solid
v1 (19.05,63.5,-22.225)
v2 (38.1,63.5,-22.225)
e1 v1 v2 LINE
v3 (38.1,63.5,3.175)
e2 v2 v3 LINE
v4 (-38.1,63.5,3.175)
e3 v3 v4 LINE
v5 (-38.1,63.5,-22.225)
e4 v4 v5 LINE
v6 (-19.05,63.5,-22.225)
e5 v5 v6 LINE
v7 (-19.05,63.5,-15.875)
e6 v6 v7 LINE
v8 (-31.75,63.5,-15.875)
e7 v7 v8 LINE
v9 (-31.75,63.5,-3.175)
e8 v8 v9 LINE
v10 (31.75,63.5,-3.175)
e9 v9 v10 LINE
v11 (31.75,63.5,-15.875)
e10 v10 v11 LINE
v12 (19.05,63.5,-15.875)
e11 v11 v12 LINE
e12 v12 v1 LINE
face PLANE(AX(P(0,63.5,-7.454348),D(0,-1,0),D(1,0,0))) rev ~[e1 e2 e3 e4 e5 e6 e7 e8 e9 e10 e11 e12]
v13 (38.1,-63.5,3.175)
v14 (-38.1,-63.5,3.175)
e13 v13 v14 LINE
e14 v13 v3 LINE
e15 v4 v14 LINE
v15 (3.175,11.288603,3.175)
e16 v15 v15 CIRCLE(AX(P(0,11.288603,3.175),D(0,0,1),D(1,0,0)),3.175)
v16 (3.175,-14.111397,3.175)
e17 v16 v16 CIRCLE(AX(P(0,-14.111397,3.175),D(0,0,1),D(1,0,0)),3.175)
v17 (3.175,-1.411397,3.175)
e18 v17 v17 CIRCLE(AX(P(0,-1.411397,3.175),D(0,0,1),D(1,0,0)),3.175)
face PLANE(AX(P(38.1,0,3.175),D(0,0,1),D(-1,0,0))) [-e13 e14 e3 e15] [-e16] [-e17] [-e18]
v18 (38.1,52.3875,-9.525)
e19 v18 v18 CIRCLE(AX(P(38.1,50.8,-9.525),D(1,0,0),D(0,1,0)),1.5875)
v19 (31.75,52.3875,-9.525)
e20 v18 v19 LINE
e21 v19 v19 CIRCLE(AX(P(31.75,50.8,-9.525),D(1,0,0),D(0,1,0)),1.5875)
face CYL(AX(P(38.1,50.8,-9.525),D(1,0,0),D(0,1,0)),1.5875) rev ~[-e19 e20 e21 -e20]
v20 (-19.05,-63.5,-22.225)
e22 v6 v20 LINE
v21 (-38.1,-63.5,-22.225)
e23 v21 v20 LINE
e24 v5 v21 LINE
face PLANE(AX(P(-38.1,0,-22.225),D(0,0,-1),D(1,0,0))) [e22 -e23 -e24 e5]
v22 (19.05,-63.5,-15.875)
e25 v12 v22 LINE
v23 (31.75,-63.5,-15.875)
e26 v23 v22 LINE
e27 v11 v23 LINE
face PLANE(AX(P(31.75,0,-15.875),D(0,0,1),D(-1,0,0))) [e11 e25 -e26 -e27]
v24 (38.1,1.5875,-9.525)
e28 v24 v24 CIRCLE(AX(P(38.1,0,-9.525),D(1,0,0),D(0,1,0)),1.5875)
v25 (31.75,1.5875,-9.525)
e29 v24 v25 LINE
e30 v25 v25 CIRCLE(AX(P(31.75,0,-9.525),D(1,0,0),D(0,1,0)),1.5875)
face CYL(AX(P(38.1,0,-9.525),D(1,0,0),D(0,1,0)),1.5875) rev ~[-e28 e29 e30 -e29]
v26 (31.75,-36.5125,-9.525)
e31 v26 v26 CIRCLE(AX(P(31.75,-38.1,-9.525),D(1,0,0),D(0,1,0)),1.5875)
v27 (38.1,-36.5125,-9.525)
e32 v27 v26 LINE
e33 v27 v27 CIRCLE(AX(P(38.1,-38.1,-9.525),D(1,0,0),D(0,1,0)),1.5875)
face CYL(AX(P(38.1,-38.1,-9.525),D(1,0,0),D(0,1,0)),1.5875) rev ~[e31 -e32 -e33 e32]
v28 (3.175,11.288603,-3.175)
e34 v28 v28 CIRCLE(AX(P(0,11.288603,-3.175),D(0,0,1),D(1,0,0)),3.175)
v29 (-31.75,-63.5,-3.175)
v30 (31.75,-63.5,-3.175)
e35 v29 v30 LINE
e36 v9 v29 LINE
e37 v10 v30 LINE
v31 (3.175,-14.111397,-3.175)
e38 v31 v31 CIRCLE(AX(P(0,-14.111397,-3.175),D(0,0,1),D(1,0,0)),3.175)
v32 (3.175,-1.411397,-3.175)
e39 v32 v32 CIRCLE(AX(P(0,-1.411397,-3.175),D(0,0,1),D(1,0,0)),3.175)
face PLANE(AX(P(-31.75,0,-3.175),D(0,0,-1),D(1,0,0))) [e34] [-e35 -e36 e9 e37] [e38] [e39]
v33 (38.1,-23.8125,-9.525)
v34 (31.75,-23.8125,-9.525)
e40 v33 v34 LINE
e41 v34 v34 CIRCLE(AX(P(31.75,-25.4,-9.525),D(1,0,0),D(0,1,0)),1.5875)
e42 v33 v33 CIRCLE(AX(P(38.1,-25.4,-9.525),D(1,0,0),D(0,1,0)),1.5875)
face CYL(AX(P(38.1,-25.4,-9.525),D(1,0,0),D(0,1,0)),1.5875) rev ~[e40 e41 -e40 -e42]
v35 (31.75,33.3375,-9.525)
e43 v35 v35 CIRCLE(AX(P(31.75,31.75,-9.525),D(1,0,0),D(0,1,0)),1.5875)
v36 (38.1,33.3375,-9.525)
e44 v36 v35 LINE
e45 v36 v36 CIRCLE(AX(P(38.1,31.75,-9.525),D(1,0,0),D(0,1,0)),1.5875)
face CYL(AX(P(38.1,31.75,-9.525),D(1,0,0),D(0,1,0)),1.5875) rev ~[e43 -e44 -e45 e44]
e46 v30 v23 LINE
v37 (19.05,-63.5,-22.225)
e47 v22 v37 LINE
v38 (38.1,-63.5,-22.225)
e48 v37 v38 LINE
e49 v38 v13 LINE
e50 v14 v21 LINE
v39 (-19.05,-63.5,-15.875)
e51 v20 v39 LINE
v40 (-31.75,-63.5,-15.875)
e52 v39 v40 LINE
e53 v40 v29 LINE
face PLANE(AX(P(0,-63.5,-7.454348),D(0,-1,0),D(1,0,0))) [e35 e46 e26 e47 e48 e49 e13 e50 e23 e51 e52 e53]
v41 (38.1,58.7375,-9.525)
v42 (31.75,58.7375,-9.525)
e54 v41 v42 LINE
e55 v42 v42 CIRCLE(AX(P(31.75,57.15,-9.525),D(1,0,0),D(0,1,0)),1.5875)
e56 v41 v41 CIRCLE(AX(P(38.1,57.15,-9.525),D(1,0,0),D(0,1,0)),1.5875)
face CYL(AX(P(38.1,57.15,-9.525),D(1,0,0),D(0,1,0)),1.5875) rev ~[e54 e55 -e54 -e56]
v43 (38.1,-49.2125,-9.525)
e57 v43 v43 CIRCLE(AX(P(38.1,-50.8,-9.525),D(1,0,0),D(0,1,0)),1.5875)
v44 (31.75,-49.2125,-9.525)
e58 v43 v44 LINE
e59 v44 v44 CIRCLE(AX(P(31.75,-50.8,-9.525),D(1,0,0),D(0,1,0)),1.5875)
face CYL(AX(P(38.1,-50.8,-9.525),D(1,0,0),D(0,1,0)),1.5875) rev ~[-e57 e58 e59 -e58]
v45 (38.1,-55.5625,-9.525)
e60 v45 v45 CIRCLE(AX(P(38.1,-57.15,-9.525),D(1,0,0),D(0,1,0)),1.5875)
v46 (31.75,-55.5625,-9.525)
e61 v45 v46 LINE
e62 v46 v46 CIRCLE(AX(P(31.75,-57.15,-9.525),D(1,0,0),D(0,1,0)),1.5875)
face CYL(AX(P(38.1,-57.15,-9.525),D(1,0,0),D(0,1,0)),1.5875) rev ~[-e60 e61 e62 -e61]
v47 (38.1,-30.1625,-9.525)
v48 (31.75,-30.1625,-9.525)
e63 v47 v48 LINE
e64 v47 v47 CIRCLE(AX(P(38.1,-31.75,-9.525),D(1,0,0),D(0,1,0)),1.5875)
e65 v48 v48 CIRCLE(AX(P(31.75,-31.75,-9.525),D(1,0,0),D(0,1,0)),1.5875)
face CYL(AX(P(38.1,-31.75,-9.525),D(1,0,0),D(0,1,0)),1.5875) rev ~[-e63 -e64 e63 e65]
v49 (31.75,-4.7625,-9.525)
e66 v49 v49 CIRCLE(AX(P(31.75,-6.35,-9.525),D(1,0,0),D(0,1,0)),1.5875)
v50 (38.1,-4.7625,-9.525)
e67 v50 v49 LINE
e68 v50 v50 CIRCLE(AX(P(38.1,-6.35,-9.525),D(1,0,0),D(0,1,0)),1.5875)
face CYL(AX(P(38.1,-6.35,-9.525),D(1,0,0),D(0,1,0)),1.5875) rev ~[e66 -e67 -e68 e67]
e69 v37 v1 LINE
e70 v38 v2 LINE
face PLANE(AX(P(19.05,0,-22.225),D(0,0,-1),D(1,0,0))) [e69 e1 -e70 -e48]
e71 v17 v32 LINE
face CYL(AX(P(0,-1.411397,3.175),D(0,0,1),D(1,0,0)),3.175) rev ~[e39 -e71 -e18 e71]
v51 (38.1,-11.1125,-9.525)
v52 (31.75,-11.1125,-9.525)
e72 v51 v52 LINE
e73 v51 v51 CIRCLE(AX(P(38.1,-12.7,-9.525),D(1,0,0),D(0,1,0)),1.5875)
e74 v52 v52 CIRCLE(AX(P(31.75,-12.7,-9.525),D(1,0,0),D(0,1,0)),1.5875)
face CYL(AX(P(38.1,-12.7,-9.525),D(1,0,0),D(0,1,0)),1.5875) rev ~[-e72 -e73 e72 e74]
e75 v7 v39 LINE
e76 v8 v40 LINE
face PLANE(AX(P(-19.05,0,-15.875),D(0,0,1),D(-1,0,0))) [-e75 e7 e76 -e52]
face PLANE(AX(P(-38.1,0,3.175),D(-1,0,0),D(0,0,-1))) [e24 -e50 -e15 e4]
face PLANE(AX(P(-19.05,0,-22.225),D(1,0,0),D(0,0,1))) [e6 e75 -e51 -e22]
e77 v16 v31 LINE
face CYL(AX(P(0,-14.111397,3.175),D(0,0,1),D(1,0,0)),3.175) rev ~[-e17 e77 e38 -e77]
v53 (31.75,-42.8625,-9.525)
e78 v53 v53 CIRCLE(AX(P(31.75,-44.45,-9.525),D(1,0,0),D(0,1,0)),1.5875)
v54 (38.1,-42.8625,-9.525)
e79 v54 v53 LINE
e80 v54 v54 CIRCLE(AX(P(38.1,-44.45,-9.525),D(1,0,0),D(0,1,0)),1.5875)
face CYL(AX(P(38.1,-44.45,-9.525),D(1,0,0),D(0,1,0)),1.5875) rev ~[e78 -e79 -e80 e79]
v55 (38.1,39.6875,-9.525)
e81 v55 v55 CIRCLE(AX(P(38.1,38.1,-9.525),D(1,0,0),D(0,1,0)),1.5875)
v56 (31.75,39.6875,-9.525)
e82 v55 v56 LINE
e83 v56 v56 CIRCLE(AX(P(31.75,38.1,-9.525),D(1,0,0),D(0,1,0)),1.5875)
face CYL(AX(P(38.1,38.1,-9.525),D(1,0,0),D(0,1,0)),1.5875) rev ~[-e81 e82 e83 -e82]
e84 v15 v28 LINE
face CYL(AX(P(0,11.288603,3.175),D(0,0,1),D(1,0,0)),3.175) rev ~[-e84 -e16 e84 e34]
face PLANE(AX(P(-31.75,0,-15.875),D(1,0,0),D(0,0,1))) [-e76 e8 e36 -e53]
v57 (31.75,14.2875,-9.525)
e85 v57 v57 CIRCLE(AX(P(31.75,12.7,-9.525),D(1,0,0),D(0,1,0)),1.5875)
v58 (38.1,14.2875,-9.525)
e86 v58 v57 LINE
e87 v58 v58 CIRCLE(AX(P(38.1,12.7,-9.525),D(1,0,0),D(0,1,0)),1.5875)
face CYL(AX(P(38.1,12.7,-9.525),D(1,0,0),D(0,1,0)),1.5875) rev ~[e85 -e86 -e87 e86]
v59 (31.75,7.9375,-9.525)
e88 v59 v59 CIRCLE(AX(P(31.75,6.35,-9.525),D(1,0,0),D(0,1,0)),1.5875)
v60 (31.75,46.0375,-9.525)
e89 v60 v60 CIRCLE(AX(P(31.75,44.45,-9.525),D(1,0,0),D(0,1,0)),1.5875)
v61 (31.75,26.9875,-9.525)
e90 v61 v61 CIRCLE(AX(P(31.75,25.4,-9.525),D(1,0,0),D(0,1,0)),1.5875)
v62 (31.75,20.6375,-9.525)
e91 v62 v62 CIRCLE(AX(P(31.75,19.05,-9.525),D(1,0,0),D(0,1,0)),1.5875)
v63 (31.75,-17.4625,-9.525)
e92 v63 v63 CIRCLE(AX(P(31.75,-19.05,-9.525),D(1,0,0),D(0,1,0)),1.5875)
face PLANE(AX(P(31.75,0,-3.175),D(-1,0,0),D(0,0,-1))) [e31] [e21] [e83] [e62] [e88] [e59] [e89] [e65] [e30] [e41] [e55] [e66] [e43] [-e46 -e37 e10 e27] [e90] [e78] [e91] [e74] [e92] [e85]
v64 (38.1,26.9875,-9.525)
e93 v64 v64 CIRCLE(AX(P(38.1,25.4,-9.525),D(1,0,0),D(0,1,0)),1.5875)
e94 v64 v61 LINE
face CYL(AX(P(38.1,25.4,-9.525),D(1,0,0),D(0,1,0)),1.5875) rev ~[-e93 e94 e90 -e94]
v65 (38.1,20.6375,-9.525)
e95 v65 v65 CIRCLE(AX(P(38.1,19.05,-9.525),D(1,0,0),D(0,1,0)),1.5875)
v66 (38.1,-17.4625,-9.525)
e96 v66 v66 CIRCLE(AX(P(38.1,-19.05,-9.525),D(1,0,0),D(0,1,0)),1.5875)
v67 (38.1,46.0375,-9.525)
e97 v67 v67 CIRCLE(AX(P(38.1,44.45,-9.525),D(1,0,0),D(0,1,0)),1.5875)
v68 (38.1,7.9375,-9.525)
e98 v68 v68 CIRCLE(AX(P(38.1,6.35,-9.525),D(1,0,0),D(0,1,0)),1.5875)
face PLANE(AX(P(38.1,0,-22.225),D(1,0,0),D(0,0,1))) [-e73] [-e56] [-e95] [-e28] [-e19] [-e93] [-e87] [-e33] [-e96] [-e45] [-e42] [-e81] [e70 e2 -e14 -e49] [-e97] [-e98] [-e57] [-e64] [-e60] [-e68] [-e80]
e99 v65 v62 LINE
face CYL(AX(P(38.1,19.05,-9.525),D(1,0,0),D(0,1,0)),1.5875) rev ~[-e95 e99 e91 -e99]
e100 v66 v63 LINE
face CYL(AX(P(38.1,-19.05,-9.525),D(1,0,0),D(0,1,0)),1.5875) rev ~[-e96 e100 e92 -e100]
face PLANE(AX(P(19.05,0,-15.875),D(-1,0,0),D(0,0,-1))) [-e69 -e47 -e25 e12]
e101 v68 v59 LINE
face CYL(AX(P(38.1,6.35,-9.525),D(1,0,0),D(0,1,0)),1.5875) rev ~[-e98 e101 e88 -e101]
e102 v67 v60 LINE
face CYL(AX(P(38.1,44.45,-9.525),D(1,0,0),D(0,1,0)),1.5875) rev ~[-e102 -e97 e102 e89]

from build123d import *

# Parameters (mm, degrees)
F1_DEPTH = 63.5
F3_R     = 1.5875
F4_DEPTH = 6.35
F2_R     = 3.175
F5_DEPTH = 6.35
F6_DEPTH = 6.35


# Not quite as in the source:
# - a feature names something its author has since deleted; it is built from what else it names


with BuildPart() as f1:
    # F0 (on Front) → F1 (new body, symmetric)
    with BuildSketch(Plane.XZ):
        Polygon((38.1, 3.175), (31.75, 3.175), (-31.75, 3.175), (-38.1, 3.175), (-38.1, -22.225), (-19.05, -22.225), (-19.05, -15.875), (-31.75, -15.875), (-31.75, -3.175), (31.75, -3.175), (31.75, -15.875), (19.05, -15.875), (19.05, -22.225), (38.1, -22.225), align=None)
    extrude(amount=F1_DEPTH, both=True)

    # F3 (on face) → F4 (cut)
    with BuildSketch(Plane.YZ.offset(38.1)):
        with Locations((-57.15, -9.525)):
            Circle(F3_R)
        with Locations((-50.8, -9.525)):
            Circle(F3_R)
        with Locations((-44.45, -9.525)):
            Circle(F3_R)
        with Locations((-38.1, -9.525)):
            Circle(F3_R)
        with Locations((-31.75, -9.525)):
            Circle(F3_R)
        with Locations((-25.4, -9.525)):
            Circle(F3_R)
        with Locations((-19.05, -9.525)):
            Circle(F3_R)
        with Locations((-12.7, -9.525)):
            Circle(F3_R)
        with Locations((-6.35, -9.525)):
            Circle(F3_R)
        with Locations((0, -9.525)):
            Circle(F3_R)
        with Locations((6.35, -9.525)):
            Circle(F3_R)
    extrude(amount=-F4_DEPTH, mode=Mode.SUBTRACT)

    # F2 (on face) → F5 (cut)
    with BuildSketch(Plane.XY.offset(3.175)):
        with Locations((0, 11.2886031434)):
            Circle(F2_R)
        with Locations((0, -1.4113968566)):
            Circle(F2_R)
        with Locations((0, -14.1113968566)):
            Circle(F2_R)
    extrude(amount=-F5_DEPTH, mode=Mode.SUBTRACT)

    # F3 (on face) → F6 (cut)
    with BuildSketch(Plane.YZ.offset(38.1)):
        with Locations((12.7, -9.525)):
            Circle(F3_R)
        with Locations((19.05, -9.525)):
            Circle(F3_R)
        with Locations((25.4, -9.525)):
            Circle(F3_R)
        with Locations((31.75, -9.525)):
            Circle(F3_R)
        with Locations((38.1, -9.525)):
            Circle(F3_R)
        with Locations((44.45, -9.525)):
            Circle(F3_R)
        with Locations((50.8, -9.525)):
            Circle(F3_R)
        with Locations((57.15, -9.525)):
            Circle(F3_R)
    extrude(amount=-F6_DEPTH, mode=Mode.SUBTRACT)


solid = f1.part
